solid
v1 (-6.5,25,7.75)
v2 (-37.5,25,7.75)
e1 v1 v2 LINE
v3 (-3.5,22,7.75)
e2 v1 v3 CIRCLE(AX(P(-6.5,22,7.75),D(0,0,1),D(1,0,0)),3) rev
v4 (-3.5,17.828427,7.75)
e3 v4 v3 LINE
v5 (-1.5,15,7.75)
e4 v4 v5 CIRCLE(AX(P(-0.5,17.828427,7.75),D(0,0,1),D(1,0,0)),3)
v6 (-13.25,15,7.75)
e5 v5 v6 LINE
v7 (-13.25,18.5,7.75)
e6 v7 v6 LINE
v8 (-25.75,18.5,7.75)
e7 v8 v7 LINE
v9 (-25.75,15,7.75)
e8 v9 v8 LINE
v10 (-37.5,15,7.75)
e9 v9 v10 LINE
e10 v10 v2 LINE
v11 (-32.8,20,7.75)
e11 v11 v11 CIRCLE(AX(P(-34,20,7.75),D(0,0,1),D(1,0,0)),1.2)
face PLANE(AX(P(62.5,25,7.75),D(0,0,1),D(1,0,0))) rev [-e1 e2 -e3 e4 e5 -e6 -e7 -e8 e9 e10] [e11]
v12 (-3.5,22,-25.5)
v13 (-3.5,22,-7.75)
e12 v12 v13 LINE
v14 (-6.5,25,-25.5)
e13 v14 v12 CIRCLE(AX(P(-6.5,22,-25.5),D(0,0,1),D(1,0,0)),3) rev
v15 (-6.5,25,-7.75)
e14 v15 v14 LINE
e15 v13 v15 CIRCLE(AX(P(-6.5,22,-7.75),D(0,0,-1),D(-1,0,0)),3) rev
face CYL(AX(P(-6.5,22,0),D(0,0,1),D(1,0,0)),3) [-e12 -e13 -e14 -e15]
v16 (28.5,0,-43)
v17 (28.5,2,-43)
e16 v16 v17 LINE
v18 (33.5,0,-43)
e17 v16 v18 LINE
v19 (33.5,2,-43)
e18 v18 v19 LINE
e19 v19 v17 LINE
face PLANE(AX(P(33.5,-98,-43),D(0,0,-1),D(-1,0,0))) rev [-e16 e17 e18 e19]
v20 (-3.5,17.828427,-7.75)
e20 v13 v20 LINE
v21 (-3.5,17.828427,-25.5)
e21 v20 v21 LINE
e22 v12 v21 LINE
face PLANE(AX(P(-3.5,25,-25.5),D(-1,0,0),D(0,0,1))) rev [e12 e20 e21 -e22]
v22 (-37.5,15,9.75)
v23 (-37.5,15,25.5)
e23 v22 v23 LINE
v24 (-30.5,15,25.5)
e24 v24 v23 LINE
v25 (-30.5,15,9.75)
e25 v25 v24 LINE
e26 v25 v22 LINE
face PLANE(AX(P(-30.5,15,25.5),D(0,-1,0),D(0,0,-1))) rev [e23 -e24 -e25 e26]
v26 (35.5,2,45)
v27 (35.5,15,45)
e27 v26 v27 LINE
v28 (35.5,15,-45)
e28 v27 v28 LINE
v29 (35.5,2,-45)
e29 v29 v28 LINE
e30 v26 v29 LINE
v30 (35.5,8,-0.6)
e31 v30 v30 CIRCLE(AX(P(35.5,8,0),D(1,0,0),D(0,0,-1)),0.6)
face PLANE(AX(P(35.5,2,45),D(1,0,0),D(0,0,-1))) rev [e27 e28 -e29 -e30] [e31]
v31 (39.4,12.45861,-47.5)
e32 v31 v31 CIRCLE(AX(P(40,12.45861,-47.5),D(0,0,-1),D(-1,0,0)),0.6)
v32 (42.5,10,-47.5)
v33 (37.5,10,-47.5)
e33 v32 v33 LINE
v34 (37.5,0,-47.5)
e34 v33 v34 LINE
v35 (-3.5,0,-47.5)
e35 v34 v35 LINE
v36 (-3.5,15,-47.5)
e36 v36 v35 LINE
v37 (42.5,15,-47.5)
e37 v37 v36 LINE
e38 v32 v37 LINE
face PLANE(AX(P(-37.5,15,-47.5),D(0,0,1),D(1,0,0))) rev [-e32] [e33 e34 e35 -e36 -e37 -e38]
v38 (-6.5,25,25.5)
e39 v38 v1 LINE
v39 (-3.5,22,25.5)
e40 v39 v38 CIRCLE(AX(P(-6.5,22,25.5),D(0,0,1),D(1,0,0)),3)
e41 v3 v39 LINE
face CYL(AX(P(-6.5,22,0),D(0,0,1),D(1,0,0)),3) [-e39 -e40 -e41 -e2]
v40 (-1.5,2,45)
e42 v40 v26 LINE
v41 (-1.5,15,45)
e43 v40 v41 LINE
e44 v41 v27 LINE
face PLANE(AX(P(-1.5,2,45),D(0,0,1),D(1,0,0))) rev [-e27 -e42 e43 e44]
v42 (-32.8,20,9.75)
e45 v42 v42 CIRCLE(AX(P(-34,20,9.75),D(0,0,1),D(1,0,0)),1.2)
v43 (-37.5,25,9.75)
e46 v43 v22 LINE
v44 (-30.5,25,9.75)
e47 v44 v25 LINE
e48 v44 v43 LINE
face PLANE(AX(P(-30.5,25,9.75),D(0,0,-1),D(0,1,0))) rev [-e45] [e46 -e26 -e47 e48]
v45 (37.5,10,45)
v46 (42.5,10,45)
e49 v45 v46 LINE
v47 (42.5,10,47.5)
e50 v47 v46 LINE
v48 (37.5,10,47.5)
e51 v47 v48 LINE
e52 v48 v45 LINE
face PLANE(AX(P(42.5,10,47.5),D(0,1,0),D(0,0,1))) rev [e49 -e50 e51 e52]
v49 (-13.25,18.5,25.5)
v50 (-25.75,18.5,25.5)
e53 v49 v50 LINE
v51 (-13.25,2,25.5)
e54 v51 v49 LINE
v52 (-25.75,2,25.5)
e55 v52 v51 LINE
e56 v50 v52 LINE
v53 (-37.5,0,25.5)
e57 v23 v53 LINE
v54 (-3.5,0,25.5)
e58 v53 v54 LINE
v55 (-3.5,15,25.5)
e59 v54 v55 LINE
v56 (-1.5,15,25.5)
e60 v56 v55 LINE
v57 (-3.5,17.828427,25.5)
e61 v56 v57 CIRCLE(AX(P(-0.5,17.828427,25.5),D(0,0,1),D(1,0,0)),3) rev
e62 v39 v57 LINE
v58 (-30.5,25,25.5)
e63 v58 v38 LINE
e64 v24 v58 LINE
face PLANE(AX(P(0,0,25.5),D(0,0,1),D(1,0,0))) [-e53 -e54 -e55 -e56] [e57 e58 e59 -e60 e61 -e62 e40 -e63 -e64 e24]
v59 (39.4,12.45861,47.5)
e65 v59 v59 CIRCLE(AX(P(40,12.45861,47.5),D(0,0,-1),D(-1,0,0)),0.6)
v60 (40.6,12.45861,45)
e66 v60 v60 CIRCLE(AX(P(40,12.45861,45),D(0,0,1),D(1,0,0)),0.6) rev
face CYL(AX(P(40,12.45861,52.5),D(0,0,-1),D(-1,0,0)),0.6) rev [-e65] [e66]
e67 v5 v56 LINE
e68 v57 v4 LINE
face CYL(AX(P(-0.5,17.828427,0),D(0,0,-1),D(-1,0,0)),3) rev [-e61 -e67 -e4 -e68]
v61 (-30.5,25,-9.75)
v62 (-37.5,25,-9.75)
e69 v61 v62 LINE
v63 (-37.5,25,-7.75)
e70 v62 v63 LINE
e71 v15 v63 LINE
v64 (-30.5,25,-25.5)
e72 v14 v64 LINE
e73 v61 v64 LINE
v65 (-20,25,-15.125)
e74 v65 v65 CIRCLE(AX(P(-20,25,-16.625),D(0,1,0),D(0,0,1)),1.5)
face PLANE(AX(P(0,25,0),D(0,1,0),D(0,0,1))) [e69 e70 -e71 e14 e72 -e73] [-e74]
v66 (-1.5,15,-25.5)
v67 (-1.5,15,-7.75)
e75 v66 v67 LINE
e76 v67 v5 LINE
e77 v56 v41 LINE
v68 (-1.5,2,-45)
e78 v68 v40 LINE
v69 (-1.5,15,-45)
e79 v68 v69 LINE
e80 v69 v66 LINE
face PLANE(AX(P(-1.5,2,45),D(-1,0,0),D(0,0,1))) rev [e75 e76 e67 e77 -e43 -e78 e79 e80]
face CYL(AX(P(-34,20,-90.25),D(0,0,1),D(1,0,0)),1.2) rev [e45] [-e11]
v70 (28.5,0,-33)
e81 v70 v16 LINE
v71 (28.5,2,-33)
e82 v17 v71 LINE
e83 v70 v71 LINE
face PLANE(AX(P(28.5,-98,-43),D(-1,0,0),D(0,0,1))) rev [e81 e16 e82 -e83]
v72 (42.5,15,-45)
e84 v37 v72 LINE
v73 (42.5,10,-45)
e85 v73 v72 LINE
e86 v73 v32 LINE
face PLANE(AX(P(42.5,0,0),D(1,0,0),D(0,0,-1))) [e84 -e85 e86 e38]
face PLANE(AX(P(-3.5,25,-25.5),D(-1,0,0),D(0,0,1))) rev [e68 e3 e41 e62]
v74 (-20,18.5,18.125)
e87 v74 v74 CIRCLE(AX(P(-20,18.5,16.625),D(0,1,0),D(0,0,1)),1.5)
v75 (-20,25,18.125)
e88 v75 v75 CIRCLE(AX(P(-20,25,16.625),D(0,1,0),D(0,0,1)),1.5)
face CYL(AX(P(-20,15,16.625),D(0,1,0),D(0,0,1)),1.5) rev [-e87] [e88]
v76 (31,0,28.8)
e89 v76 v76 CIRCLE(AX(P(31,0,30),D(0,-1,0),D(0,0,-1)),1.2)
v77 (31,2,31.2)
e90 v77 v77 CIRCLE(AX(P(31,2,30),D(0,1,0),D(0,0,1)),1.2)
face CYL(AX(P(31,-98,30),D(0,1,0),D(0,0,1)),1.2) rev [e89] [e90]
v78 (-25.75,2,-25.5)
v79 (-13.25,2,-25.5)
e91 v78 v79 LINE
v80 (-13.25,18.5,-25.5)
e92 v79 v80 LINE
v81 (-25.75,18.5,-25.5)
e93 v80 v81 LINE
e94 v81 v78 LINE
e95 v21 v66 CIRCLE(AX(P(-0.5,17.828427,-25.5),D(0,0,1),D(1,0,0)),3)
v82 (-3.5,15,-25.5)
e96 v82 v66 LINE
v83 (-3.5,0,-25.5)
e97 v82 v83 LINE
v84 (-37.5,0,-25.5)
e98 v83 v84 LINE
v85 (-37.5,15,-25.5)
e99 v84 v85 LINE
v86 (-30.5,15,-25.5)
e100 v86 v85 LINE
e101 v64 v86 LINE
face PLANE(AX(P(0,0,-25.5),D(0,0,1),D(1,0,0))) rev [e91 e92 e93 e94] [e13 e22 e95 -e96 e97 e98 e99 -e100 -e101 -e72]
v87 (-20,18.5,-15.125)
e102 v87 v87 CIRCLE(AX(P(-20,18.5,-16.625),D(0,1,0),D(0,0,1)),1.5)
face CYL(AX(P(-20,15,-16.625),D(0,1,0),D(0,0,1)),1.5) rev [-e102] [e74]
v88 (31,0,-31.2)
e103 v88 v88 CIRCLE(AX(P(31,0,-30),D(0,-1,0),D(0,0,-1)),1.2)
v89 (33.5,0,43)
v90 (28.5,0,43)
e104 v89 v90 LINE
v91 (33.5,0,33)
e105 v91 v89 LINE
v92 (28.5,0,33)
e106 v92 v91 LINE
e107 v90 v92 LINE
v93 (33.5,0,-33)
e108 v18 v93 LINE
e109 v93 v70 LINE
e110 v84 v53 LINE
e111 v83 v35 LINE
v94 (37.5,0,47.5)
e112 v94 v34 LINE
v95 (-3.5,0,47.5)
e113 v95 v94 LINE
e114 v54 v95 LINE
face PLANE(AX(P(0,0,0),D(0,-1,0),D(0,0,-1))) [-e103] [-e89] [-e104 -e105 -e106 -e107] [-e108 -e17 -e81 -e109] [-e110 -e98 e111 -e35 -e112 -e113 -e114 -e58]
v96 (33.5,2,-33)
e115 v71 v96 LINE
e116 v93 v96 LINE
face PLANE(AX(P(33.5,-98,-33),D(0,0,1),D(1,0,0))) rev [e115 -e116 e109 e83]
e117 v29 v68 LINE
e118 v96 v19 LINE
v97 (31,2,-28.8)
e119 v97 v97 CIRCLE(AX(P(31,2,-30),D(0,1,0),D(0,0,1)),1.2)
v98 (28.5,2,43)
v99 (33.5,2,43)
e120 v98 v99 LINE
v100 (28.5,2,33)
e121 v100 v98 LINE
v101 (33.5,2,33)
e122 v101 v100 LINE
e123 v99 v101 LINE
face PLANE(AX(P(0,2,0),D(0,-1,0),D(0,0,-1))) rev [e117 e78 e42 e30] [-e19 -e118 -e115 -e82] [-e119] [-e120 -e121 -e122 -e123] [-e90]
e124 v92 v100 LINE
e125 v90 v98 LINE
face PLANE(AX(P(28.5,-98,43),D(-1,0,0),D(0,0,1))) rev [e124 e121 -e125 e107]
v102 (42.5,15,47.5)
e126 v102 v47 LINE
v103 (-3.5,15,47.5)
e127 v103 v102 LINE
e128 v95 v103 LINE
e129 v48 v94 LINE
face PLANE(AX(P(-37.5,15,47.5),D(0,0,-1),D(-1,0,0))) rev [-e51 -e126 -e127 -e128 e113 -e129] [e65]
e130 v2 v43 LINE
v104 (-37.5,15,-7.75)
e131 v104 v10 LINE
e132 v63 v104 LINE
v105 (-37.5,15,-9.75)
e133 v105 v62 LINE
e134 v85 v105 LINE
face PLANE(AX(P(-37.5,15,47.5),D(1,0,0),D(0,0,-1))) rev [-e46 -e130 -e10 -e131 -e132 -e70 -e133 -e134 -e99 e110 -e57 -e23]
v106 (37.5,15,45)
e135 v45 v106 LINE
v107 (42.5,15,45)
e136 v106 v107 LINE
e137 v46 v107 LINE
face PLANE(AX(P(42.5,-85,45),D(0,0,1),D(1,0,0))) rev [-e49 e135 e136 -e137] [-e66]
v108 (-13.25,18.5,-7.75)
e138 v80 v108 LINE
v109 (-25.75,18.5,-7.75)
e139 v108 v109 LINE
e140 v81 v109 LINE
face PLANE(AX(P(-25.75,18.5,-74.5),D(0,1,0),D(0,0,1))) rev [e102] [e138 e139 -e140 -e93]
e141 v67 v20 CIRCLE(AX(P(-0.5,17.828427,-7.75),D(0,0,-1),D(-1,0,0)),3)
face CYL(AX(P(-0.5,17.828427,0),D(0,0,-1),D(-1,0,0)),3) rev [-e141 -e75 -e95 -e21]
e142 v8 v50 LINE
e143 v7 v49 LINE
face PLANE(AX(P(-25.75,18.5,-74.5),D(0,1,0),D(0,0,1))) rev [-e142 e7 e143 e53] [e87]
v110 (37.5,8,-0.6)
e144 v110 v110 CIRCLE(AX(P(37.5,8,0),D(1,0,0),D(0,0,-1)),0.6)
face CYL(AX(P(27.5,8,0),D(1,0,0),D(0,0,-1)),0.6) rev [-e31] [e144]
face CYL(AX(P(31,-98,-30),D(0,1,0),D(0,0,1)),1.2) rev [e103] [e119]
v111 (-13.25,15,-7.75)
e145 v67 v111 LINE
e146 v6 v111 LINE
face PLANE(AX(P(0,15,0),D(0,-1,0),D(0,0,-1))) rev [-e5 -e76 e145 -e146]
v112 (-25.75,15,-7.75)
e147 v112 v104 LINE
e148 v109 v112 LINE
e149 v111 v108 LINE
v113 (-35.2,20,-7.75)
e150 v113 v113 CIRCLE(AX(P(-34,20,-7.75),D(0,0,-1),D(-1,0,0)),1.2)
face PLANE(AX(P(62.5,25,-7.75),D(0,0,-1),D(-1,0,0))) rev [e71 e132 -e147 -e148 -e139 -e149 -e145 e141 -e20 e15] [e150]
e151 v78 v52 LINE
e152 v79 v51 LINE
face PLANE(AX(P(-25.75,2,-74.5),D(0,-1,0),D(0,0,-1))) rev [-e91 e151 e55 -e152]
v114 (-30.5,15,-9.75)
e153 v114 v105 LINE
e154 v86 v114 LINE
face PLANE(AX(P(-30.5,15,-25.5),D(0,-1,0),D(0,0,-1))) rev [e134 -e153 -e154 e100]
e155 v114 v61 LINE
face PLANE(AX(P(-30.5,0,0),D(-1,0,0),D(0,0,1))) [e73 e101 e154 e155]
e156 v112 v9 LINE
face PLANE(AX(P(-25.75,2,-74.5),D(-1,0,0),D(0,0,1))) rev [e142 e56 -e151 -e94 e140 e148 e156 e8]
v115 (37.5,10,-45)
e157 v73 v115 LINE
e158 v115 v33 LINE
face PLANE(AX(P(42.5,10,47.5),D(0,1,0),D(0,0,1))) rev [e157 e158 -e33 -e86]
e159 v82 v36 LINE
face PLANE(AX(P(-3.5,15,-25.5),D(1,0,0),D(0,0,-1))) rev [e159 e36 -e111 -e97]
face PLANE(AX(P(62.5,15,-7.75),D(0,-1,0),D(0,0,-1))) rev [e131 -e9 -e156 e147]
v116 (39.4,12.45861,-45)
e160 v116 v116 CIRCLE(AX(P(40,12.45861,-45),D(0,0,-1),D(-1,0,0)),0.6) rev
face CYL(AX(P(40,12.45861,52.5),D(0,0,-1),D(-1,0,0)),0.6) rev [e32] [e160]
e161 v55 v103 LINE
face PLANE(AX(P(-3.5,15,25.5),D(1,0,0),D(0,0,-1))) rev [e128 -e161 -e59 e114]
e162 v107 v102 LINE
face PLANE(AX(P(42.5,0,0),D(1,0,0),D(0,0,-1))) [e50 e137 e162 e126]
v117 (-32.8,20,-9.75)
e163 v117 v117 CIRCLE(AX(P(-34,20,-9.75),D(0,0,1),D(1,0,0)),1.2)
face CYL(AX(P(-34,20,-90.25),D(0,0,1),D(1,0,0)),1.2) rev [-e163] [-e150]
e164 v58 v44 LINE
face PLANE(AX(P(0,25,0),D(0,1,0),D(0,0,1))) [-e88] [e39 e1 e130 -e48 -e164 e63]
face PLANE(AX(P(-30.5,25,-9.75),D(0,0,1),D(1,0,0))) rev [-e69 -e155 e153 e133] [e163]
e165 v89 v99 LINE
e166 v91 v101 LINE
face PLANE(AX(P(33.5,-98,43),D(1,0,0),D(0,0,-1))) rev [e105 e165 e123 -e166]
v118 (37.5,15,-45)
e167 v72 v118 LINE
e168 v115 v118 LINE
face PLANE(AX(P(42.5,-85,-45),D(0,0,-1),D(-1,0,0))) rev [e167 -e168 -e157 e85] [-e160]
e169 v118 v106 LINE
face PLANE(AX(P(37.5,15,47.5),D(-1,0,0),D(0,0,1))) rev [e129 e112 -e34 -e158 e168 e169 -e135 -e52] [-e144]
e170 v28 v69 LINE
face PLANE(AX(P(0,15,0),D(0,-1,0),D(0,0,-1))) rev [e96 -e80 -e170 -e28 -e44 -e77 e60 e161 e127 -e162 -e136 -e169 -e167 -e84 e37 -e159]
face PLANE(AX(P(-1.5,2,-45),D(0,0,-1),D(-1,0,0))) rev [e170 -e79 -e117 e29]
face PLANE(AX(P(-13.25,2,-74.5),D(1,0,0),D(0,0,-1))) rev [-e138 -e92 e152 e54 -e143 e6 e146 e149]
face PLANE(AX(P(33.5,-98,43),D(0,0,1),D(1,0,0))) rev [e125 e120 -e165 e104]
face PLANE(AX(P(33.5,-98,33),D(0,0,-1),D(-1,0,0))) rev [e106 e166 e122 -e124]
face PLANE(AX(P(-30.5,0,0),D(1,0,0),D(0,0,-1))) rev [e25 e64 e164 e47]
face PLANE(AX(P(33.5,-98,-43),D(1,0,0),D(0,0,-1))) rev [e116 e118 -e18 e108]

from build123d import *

# Parameters (mm, degrees)
SKETCH1_W           = 75
SKETCH1_H           = 95
BOSS_EXTRUDE1_DEPTH = 15
SKETCH2_W           = 95
SKETCH2_H           = 5
BOSS_EXTRUDE2_DEPTH = 5
SKETCH3_R           = 0.6
CUT_EXTRUDE1_DEPTH  = 100
SKETCH4_W           = 5
SKETCH4_H           = 90
CUT_EXTRUDE2_DEPTH  = 100
SKETCH5_W           = 34
SKETCH5_H           = 15
CUT_EXTRUDE3_DEPTH  = 22
SKETCH6_W           = 34
SKETCH6_H           = 15
CUT_EXTRUDE4_DEPTH  = 22
SKETCH7_W           = 37
SKETCH7_H           = 90
CUT_EXTRUDE5_DEPTH  = 13
SKETCH10_W          = 34
SKETCH10_H          = 51
BOSS_EXTRUDE3_DEPTH = 10
SKETCH11_W          = 12.5
SKETCH11_H          = 16.5
CUT_EXTRUDE6_DEPTH  = 100
SKETCH12_W          = 15.5
SKETCH12_H          = 10
CUT_EXTRUDE8_DEPTH  = 100
SKETCH13_W          = 15.75
SKETCH13_H          = 10
CUT_EXTRUDE9_DEPTH  = 7
SKETCH14_W          = 15.75
SKETCH14_H          = 10
CUT_EXTRUDE10_DEPTH = 7
SKETCH15_R          = 1.2
CUT_EXTRUDE11_DEPTH = 100
SKETCH16_R          = 1.2
SKETCH16_W          = 5
SKETCH16_H          = 10
CUT_EXTRUDE12_DEPTH = 100
SKETCH17_R          = 1.5
CUT_EXTRUDE14_DEPTH = 10
FILLET3_R           = 3
FILLET4_R           = 3
SKETCH19_R          = 0.6
CUT_EXTRUDE15_DEPTH = 10


with BuildPart() as part:
    # Sketch1 → Boss-Extrude1 (new body)
    with BuildSketch(Plane(origin=(0, 0, 0), x_dir=(1, 0, 0), z_dir=(0, 1, 0))):
        Rectangle(SKETCH1_W, SKETCH1_H)
    extrude(amount=BOSS_EXTRUDE1_DEPTH)

    # Sketch2 → Boss-Extrude2 (add)
    with BuildSketch(Plane(origin=(37.5, 0, 0), x_dir=(0, 0, -1), z_dir=(1, 0, 0))):
        with Locations((0, 12.5)):
            Rectangle(SKETCH2_W, SKETCH2_H)
    extrude(amount=BOSS_EXTRUDE2_DEPTH)

    # Sketch3 → Cut-Extrude1 (cut)
    with BuildSketch(Plane(origin=(0, 0, -47.5), x_dir=(-1, 0, 0), z_dir=(0, 0, -1))):
        with Locations((-40, 12.458610353)):
            Circle(SKETCH3_R)
    extrude(amount=-CUT_EXTRUDE1_DEPTH, mode=Mode.SUBTRACT)

    # Sketch4 → Cut-Extrude2 (cut)
    with BuildSketch(Plane(origin=(0, 15, 0), x_dir=(1, 0, 0), z_dir=(0, 1, 0))):
        with Locations((40, 0)):
            Rectangle(SKETCH4_W, SKETCH4_H)
    extrude(amount=-CUT_EXTRUDE2_DEPTH, mode=Mode.SUBTRACT)

    # Sketch5 → Cut-Extrude3 (cut)
    with BuildSketch(Plane(origin=(0, 0, -47.5), x_dir=(-1, 0, 0), z_dir=(0, 0, -1))):
        with Locations((20.5, 7.5)):
            Rectangle(SKETCH5_W, SKETCH5_H)
    extrude(amount=-CUT_EXTRUDE3_DEPTH, mode=Mode.SUBTRACT)

    # Sketch6 → Cut-Extrude4 (cut)
    with BuildSketch(Plane.XY.offset(47.5)):
        with Locations((-20.5, 7.5)):
            Rectangle(SKETCH6_W, SKETCH6_H)
    extrude(amount=-CUT_EXTRUDE4_DEPTH, mode=Mode.SUBTRACT)

    # Sketch7 → Cut-Extrude5 (cut)
    with BuildSketch(Plane(origin=(0, 15, 0), x_dir=(1, 0, 0), z_dir=(0, 1, 0))):
        with Locations((17, 0)):
            Rectangle(SKETCH7_W, SKETCH7_H)
    extrude(amount=-CUT_EXTRUDE5_DEPTH, mode=Mode.SUBTRACT)

    # Sketch10 → Boss-Extrude3 (add)
    with BuildSketch(Plane(origin=(0, 15, 0), x_dir=(1, 0, 0), z_dir=(0, 1, 0))):
        with Locations((-20.5, 0)):
            Rectangle(SKETCH10_W, SKETCH10_H)
    extrude(amount=BOSS_EXTRUDE3_DEPTH)

    # Sketch11 → Cut-Extrude6 (cut)
    with BuildSketch(Plane.XY.offset(25.5)):
        with Locations((-19.5, 10.25)):
            Rectangle(SKETCH11_W, SKETCH11_H)
    extrude(amount=-CUT_EXTRUDE6_DEPTH, mode=Mode.SUBTRACT)

    # Sketch12 → Cut-Extrude8 (cut)
    with BuildSketch(Plane.ZY.offset(37.5)):
        with Locations((0, 20)):
            Rectangle(SKETCH12_W, SKETCH12_H)
    extrude(amount=-CUT_EXTRUDE8_DEPTH, mode=Mode.SUBTRACT)

    # Sketch13 → Cut-Extrude9 (cut)
    with BuildSketch(Plane.ZY.offset(37.5)):
        with Locations((-17.625, 20)):
            Rectangle(SKETCH13_W, SKETCH13_H)
    extrude(amount=-CUT_EXTRUDE9_DEPTH, mode=Mode.SUBTRACT)

    # Sketch14 → Cut-Extrude10 (cut)
    with BuildSketch(Plane.ZY.offset(37.5)):
        with Locations((17.625, 20)):
            Rectangle(SKETCH14_W, SKETCH14_H)
    extrude(amount=-CUT_EXTRUDE10_DEPTH, mode=Mode.SUBTRACT)

    # Sketch15 → Cut-Extrude11 (cut)
    with BuildSketch(Plane.XY.offset(9.75)):
        with Locations((-34, 20)):
            Circle(SKETCH15_R)
    extrude(amount=-CUT_EXTRUDE11_DEPTH, mode=Mode.SUBTRACT)

    # Sketch16 → Cut-Extrude12 (cut)
    with BuildSketch(Plane(origin=(0, 2, 0), x_dir=(1, 0, 0), z_dir=(0, 1, 0))):
        with Locations(Location((31, 30, 0), (0, 0, 270))):
            Circle(SKETCH16_R)
        with Locations(Location((31, -30, 0), (0, 0, 270))):
            Circle(SKETCH16_R)
        with Locations((31, -38)):
            Rectangle(SKETCH16_W, SKETCH16_H)
        with Locations((31, 38)):
            Rectangle(SKETCH16_W, SKETCH16_H)
    extrude(amount=-CUT_EXTRUDE12_DEPTH, mode=Mode.SUBTRACT)

    # Sketch17 → Cut-Extrude14 (cut)
    with BuildSketch(Plane(origin=(0, 25, 0), x_dir=(1, 0, 0), z_dir=(0, 1, 0))):
        with Locations(Location((-20, -16.625, 0), (0, 0, 270))):
            Circle(SKETCH17_R)
        with Locations(Location((-20, 16.625, 0), (0, 0, 270))):
            Circle(SKETCH17_R)
    extrude(amount=-CUT_EXTRUDE14_DEPTH, mode=Mode.SUBTRACT)

    # Fillet3
    # the kernel refuses this fillet: 3 mm, written as the material it adds along each edge
    with BuildSketch(Plane(origin=(-3.5, 15, -25.5), x_dir=(1, 0, 0), z_dir=(0, 0, 1))) as fillet3_piece_1:
        with BuildLine():
            CenterArc((3, 2.828427125), FILLET3_R, 180, 70.528779366)
            Line((0, 2.828427125), (0, 0))
            Line((0, 0), (2, 0))
        make_face()
    extrude(amount=17.75)
    # the kernel refuses this fillet: 3 mm, written as the material it takes off along each edge
    with BuildSketch(Plane(origin=(-3.5, 25, -33), x_dir=(-1, 0, 0), z_dir=(0, 0, 1))) as fillet3_2_piece_1:
        with BuildLine():
            CenterArc((FILLET3_R, FILLET3_R), FILLET3_R, 180, 90)
            Line((0, FILLET3_R), (0, 0))
            Line((0, 0), (FILLET3_R, 0))
        make_face()
    extrude(amount=32.75, mode=Mode.SUBTRACT)

    # Fillet4
    # the kernel refuses this fillet: 3 mm, written as the material it adds along each edge
    with BuildSketch(Plane(origin=(-3.5, 15, 7.75), x_dir=(1, 0, 0), z_dir=(0, 0, 1))) as fillet4_piece_1:
        with BuildLine():
            CenterArc((3, 2.828427125), FILLET4_R, 180, 70.528779366)
            Line((0, 2.828427125), (0, 0))
            Line((0, 0), (2, 0))
        make_face()
    extrude(amount=17.75)
    # the kernel refuses this fillet: 3 mm, written as the material it takes off along each edge
    with BuildSketch(Plane(origin=(-3.5, 25, 0.25), x_dir=(-1, 0, 0), z_dir=(0, 0, 1))) as fillet4_2_piece_1:
        with BuildLine():
            CenterArc((FILLET4_R, FILLET4_R), FILLET4_R, 180, 90)
            Line((0, FILLET4_R), (0, 0))
            Line((0, 0), (FILLET4_R, 0))
        make_face()
    extrude(amount=32.75, mode=Mode.SUBTRACT)

    # Sketch19 → Cut-Extrude15 (cut)
    with BuildSketch(Plane(origin=(37.5, 0, 0), x_dir=(0, 0, -1), z_dir=(1, 0, 0))):
        with Locations((0, 8)):
            Circle(SKETCH19_R)
    extrude(amount=-CUT_EXTRUDE15_DEPTH, mode=Mode.SUBTRACT)


solid = part.part
